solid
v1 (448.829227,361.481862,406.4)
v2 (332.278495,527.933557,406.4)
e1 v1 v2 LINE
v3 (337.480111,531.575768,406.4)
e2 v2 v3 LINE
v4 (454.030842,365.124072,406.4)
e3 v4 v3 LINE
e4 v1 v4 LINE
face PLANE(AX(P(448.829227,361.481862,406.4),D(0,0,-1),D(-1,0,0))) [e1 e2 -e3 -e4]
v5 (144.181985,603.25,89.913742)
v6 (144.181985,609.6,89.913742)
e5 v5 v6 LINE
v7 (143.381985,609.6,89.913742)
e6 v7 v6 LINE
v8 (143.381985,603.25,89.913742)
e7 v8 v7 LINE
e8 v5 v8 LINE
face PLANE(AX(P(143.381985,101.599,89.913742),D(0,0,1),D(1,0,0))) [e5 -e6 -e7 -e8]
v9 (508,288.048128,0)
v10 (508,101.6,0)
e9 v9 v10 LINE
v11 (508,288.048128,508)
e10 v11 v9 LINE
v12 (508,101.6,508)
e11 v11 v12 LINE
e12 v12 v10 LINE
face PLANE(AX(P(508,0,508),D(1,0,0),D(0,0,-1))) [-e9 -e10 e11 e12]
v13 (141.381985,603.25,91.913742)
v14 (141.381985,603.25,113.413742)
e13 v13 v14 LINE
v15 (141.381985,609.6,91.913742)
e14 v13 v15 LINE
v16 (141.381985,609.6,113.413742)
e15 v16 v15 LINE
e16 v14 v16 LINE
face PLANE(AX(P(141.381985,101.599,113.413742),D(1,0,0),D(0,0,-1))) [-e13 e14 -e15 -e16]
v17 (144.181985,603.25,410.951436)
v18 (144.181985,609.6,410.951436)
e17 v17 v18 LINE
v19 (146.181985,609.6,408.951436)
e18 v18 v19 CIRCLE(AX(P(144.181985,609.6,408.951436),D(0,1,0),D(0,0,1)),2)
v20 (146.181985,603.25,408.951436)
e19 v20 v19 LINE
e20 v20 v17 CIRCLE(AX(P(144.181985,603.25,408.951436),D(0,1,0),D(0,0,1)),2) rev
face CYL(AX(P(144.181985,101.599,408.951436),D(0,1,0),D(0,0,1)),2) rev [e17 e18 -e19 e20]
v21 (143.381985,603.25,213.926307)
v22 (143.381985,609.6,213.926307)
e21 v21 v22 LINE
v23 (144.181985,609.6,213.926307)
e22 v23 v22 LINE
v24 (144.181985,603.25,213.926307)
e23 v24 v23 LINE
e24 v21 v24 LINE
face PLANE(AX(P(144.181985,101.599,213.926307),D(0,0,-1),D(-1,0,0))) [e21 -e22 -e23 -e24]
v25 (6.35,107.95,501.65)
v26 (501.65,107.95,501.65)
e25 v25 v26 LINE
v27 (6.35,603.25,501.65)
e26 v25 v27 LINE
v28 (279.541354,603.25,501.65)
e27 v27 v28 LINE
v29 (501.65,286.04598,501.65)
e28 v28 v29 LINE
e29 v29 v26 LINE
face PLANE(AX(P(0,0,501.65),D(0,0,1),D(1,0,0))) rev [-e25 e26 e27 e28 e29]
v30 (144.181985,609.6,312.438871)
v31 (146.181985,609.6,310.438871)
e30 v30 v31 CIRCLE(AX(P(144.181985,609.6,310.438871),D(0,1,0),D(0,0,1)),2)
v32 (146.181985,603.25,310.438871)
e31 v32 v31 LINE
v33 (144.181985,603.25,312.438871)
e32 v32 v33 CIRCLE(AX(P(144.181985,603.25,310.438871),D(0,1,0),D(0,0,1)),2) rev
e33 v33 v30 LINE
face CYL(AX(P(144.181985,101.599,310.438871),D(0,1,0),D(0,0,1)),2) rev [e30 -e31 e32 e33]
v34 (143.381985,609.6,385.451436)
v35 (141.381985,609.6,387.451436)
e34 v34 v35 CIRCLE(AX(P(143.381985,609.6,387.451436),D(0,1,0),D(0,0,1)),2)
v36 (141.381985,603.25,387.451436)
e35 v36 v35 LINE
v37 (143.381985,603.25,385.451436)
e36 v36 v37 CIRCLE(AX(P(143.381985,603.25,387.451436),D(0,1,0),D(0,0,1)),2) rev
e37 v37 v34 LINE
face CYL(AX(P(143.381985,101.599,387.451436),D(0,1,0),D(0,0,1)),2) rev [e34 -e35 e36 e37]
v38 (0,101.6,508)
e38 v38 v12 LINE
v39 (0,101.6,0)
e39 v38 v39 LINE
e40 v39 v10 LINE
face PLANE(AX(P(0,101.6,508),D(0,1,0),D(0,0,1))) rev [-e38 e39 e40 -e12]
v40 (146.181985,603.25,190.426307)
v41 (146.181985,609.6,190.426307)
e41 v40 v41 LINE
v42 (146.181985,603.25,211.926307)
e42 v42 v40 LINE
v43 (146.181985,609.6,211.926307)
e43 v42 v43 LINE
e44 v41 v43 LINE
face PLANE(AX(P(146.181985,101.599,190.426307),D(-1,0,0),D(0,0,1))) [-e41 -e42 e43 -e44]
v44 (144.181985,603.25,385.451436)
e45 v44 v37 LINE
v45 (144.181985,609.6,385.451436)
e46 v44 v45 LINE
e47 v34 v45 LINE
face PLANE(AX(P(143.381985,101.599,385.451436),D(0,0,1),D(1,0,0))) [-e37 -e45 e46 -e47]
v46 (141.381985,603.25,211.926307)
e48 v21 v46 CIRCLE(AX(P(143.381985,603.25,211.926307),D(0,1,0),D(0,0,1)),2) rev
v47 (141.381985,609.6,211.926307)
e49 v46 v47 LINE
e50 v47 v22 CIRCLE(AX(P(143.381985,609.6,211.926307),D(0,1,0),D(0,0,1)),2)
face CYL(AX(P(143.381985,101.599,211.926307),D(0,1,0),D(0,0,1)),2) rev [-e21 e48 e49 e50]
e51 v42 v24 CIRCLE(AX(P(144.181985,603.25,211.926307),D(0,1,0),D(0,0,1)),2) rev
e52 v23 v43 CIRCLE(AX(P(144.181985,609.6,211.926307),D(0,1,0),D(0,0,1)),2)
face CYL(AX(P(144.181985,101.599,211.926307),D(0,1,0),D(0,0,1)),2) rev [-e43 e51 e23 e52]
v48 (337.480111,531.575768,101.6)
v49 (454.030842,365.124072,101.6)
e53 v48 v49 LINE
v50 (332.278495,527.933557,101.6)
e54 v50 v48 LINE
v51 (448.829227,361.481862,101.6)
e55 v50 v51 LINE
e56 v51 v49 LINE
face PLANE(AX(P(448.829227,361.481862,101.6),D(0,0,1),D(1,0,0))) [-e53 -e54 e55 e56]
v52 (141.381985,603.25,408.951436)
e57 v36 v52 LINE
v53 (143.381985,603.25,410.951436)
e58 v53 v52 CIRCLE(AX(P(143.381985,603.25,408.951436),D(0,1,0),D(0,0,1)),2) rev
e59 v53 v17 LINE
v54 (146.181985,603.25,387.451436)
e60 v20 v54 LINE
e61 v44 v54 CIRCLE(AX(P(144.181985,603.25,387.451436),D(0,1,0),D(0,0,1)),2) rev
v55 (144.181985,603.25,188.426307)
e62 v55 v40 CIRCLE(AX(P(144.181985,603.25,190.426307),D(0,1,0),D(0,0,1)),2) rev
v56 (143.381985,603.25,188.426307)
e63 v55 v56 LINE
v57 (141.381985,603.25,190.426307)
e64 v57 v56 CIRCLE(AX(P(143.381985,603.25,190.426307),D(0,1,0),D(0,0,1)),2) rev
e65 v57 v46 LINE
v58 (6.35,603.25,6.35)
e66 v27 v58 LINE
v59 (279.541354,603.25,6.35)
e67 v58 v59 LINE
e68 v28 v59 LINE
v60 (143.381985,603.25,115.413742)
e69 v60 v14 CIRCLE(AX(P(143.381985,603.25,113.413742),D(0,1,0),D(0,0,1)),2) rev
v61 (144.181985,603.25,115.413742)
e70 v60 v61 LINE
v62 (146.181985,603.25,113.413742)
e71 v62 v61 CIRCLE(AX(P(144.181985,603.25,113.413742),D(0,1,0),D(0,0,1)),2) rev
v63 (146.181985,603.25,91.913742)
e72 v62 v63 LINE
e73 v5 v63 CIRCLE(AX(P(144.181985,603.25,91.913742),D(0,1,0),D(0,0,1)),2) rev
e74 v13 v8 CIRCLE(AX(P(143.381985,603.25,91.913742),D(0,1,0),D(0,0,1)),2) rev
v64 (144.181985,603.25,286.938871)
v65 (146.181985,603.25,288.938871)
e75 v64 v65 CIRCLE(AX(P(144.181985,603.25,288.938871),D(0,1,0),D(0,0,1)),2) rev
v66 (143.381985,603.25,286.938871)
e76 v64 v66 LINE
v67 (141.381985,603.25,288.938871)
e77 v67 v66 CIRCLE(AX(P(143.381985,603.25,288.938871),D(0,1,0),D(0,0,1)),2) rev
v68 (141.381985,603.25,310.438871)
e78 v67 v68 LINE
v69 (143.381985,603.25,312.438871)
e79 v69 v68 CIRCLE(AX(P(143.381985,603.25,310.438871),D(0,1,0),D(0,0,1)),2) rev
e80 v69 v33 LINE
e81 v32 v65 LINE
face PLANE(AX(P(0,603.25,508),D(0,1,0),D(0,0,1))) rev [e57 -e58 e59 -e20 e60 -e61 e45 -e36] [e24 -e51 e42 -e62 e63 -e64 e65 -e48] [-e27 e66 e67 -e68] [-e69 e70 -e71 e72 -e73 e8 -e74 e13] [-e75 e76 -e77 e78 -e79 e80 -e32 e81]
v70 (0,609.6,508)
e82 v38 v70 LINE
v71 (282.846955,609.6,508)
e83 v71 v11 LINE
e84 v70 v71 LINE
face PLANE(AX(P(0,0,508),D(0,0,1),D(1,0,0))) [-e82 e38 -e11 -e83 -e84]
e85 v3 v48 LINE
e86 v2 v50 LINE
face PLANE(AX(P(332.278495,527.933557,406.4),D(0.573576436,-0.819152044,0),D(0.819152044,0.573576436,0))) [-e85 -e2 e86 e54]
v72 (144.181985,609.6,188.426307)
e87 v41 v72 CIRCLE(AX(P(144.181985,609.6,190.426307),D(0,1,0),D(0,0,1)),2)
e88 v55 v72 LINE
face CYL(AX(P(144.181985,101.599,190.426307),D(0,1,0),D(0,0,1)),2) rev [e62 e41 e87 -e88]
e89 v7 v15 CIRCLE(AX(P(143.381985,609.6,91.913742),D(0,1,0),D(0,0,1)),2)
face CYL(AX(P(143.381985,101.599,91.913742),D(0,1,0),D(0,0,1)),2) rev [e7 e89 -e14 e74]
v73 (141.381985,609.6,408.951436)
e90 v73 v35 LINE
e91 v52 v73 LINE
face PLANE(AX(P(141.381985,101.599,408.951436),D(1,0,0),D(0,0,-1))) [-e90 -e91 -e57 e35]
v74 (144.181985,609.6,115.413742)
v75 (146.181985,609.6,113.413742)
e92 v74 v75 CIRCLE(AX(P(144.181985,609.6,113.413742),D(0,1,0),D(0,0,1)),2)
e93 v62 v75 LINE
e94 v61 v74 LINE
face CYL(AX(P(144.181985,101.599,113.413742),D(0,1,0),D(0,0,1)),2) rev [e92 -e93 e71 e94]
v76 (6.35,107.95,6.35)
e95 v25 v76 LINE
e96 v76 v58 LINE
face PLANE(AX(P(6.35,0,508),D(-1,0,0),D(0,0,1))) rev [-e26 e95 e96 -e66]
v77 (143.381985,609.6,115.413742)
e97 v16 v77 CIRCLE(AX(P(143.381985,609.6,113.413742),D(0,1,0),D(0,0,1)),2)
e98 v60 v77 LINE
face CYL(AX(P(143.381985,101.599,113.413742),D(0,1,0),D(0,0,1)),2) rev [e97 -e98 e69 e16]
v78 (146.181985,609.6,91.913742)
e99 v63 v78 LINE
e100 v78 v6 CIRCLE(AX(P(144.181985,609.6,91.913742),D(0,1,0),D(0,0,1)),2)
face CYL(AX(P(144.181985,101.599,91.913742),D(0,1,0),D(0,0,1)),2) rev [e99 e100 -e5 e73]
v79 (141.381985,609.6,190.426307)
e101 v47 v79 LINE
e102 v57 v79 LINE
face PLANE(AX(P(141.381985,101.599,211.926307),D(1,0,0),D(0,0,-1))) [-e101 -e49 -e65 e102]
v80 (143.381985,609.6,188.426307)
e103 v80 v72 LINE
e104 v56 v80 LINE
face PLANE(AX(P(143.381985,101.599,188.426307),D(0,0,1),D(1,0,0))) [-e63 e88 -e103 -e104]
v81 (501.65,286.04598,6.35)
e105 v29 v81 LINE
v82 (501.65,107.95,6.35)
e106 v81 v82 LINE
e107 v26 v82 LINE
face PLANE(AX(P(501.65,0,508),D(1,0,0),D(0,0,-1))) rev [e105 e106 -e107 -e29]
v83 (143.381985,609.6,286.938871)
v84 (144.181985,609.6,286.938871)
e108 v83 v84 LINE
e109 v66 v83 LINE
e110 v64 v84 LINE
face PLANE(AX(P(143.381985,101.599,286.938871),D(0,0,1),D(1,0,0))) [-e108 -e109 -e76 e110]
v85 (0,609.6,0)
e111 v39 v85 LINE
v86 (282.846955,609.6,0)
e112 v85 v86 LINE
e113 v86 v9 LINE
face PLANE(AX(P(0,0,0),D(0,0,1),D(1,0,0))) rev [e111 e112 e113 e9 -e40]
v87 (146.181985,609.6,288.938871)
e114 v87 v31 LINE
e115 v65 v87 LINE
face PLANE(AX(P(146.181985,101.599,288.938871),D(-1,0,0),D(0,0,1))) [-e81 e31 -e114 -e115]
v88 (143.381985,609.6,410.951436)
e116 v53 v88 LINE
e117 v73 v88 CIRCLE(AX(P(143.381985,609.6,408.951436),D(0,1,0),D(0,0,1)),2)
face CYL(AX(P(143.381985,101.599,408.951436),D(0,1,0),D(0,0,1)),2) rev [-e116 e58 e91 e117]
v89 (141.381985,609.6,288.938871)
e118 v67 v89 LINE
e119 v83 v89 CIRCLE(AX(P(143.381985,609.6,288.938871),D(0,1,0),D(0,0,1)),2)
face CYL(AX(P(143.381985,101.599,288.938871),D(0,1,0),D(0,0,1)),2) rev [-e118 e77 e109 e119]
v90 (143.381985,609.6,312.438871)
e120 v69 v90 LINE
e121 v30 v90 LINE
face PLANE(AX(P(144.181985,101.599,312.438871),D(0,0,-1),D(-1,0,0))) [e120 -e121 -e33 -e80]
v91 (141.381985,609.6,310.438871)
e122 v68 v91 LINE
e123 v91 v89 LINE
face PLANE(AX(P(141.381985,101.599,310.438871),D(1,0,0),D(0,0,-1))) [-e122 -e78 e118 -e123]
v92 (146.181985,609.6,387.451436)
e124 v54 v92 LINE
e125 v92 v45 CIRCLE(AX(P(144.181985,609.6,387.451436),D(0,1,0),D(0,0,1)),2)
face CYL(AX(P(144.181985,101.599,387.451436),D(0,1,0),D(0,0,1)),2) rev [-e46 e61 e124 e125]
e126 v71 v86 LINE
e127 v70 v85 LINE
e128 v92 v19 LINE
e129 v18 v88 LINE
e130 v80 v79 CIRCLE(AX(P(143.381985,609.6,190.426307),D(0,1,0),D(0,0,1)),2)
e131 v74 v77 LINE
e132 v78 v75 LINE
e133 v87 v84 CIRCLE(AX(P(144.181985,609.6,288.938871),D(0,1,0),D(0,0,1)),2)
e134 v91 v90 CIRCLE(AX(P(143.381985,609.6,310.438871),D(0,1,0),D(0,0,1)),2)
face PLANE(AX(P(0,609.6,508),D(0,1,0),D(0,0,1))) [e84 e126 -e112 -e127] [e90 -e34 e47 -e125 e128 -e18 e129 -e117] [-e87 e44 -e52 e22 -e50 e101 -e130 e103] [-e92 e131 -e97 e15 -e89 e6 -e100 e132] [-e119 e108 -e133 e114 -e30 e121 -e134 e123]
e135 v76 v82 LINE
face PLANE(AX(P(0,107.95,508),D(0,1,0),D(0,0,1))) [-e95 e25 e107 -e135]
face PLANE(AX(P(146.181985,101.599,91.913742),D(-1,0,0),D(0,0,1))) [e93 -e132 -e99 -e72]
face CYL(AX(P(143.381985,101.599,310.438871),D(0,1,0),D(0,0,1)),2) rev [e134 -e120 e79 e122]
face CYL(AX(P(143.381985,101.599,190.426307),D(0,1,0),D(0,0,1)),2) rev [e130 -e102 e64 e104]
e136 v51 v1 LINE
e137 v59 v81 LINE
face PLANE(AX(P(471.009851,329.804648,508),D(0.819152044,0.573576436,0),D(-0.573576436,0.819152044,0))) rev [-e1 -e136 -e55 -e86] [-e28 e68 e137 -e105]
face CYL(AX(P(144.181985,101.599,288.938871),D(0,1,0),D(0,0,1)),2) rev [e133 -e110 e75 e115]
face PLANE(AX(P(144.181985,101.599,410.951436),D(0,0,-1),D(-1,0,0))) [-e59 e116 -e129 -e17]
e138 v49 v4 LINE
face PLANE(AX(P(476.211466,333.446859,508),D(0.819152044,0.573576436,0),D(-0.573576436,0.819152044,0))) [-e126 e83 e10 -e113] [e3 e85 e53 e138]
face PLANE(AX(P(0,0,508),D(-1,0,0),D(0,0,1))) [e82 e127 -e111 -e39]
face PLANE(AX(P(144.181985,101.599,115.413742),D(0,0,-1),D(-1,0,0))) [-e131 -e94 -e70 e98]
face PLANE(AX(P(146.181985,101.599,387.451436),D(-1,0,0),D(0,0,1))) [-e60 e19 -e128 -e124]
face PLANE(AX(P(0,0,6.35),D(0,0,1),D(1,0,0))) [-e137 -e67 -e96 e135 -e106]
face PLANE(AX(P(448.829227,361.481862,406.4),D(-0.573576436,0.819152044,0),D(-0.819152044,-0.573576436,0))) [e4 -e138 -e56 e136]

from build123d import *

# Parameters (mm, degrees)
BOSS_EXTRUDE1_DEPTH = 508
SKETCH3_W           = 304.8
SKETCH3_H           = 203.2
CUT_EXTRUDE3_DEPTH  = 6.35
SHELL2_START        = 6.35
SHELL2_DEPTH        = 495.3
CUT_EXTRUDE5_REACH  = 881.882


# Read off the part's stored shape, not the designer's step: Shell2
with BuildPart() as part:
    # Sketch1 → Boss-Extrude1 (new body)
    with BuildSketch(Plane.XY):
        Polygon((0, 101.6), (0, 609.6), (282.846955047, 609.6), (508, 288.048127639), (508, 101.6), align=None)
    extrude(amount=BOSS_EXTRUDE1_DEPTH)

    # Sketch3 → Cut-Extrude3 (cut)
    with BuildSketch(Plane(origin=(-2211.042315979, 4171.242991451, 0), x_dir=(0, 0, -1), z_dir=(-0.8191520442889911, -0.573576436351047, 0))):
        with Locations((-254, 4544.813258204)):
            Rectangle(SKETCH3_W, SKETCH3_H)
    extrude(amount=CUT_EXTRUDE3_DEPTH, mode=Mode.SUBTRACT)

    # Shell2 outline → Shell2 (cut)
    with BuildSketch(Plane.XY.offset(SHELL2_START)):
        Polygon((501.65, 107.95), (501.65, 286.045980329), (279.541354276, 603.25), (6.35, 603.25), (6.35, 107.95), align=None)
    extrude(amount=SHELL2_DEPTH, mode=Mode.SUBTRACT)

    # Sketch10 → Cut-Extrude5 (cut, up to next)
    with BuildSketch(Plane(origin=(0, 609.6, 0), x_dir=(1, 0, 0), z_dir=(0, 1, 0)), mode=Mode.PRIVATE) as cut_extrude5_sk1:
        with BuildLine():
            Line((143.381985017, -385.451435914), (144.181985017, -385.451435914))
            ThreePointArc((144.181985017, -385.451435914), (145.596198579, -386.037222352), (146.181985017, -387.451435914))
            Line((146.181985017, -387.451435914), (146.181985017, -408.951435914))
            ThreePointArc((146.181985017, -408.951435914), (145.596198579, -410.365649476), (144.181985017, -410.951435914))
            Line((144.181985017, -410.951435914), (143.381985017, -410.951435914))
            ThreePointArc((143.381985017, -410.951435914), (141.967771454, -410.365649476), (141.381985017, -408.951435914))
            Line((141.381985017, -408.951435914), (141.381985017, -387.451435914))
            ThreePointArc((141.381985017, -387.451435914), (141.967771454, -386.037222352), (143.381985017, -385.451435914))
        make_face()
    cut_extrude5_tool1 = extrude(cut_extrude5_sk1.sketch, amount=-CUT_EXTRUDE5_REACH, mode=Mode.PRIVATE) & part.part
    # Sketch10 → Cut-Extrude5 (cut, up to next)
    with BuildSketch(Plane(origin=(0, 609.6, 0), x_dir=(1, 0, 0), z_dir=(0, 1, 0)), mode=Mode.PRIVATE) as cut_extrude5_sk2:
        with BuildLine():
            Line((144.181985017, -312.438871317), (143.381985017, -312.438871317))
            ThreePointArc((143.381985017, -312.438871317), (141.967771454, -311.853084879), (141.381985017, -310.438871317))
            Line((141.381985017, -310.438871317), (141.381985017, -288.938871317))
            ThreePointArc((141.381985017, -288.938871317), (141.967771454, -287.524657755), (143.381985017, -286.938871317))
            Line((143.381985017, -286.938871317), (144.181985017, -286.938871317))
            ThreePointArc((144.181985017, -286.938871317), (145.596198579, -287.524657755), (146.181985017, -288.938871317))
            Line((146.181985017, -288.938871317), (146.181985017, -310.438871317))
            ThreePointArc((146.181985017, -310.438871317), (145.596198579, -311.853084879), (144.181985017, -312.438871317))
        make_face()
    cut_extrude5_tool2 = extrude(cut_extrude5_sk2.sketch, amount=-CUT_EXTRUDE5_REACH, mode=Mode.PRIVATE) & part.part
    # Sketch10 → Cut-Extrude5 (cut, up to next)
    with BuildSketch(Plane(origin=(0, 609.6, 0), x_dir=(1, 0, 0), z_dir=(0, 1, 0)), mode=Mode.PRIVATE) as cut_extrude5_sk3:
        with BuildLine():
            Line((144.181985017, -213.92630672), (143.381985017, -213.92630672))
            ThreePointArc((143.381985017, -213.92630672), (141.967771454, -213.340520282), (141.381985017, -211.92630672))
            Line((141.381985017, -211.92630672), (141.381985017, -190.42630672))
            ThreePointArc((141.381985017, -190.42630672), (141.967771454, -189.012093158), (143.381985017, -188.42630672))
            Line((143.381985017, -188.42630672), (144.181985017, -188.42630672))
            ThreePointArc((144.181985017, -188.42630672), (145.596198579, -189.012093158), (146.181985017, -190.42630672))
            Line((146.181985017, -190.42630672), (146.181985017, -211.92630672))
            ThreePointArc((146.181985017, -211.92630672), (145.596198579, -213.340520282), (144.181985017, -213.92630672))
        make_face()
    cut_extrude5_tool3 = extrude(cut_extrude5_sk3.sketch, amount=-CUT_EXTRUDE5_REACH, mode=Mode.PRIVATE) & part.part
    # Sketch10 → Cut-Extrude5 (cut, up to next)
    with BuildSketch(Plane(origin=(0, 609.6, 0), x_dir=(1, 0, 0), z_dir=(0, 1, 0)), mode=Mode.PRIVATE) as cut_extrude5_sk4:
        with BuildLine():
            Line((144.181985017, -115.413742123), (143.381985017, -115.413742123))
            ThreePointArc((143.381985017, -115.413742123), (141.967771454, -114.827955685), (141.381985017, -113.413742123))
            Line((141.381985017, -113.413742123), (141.381985017, -91.913742123))
            ThreePointArc((141.381985017, -91.913742123), (141.967771454, -90.499528561), (143.381985017, -89.913742123))
            Line((143.381985017, -89.913742123), (144.181985017, -89.913742123))
            ThreePointArc((144.181985017, -89.913742123), (145.596198579, -90.499528561), (146.181985017, -91.913742123))
            Line((146.181985017, -91.913742123), (146.181985017, -113.413742123))
            ThreePointArc((146.181985017, -113.413742123), (145.596198579, -114.827955685), (144.181985017, -115.413742123))
        make_face()
    cut_extrude5_tool4 = extrude(cut_extrude5_sk4.sketch, amount=-CUT_EXTRUDE5_REACH, mode=Mode.PRIVATE) & part.part
    add(cut_extrude5_tool1.solids().sort_by_distance((143.781985, 609.6, 398.201436))[0], mode=Mode.SUBTRACT)
    add(cut_extrude5_tool2.solids().sort_by_distance((143.781985, 609.6, 299.688871))[0], mode=Mode.SUBTRACT)
    add(cut_extrude5_tool3.solids().sort_by_distance((143.781985, 609.6, 201.176307))[0], mode=Mode.SUBTRACT)
    add(cut_extrude5_tool4.solids().sort_by_distance((143.781985, 609.6, 102.663742))[0], mode=Mode.SUBTRACT)


solid = part.part
